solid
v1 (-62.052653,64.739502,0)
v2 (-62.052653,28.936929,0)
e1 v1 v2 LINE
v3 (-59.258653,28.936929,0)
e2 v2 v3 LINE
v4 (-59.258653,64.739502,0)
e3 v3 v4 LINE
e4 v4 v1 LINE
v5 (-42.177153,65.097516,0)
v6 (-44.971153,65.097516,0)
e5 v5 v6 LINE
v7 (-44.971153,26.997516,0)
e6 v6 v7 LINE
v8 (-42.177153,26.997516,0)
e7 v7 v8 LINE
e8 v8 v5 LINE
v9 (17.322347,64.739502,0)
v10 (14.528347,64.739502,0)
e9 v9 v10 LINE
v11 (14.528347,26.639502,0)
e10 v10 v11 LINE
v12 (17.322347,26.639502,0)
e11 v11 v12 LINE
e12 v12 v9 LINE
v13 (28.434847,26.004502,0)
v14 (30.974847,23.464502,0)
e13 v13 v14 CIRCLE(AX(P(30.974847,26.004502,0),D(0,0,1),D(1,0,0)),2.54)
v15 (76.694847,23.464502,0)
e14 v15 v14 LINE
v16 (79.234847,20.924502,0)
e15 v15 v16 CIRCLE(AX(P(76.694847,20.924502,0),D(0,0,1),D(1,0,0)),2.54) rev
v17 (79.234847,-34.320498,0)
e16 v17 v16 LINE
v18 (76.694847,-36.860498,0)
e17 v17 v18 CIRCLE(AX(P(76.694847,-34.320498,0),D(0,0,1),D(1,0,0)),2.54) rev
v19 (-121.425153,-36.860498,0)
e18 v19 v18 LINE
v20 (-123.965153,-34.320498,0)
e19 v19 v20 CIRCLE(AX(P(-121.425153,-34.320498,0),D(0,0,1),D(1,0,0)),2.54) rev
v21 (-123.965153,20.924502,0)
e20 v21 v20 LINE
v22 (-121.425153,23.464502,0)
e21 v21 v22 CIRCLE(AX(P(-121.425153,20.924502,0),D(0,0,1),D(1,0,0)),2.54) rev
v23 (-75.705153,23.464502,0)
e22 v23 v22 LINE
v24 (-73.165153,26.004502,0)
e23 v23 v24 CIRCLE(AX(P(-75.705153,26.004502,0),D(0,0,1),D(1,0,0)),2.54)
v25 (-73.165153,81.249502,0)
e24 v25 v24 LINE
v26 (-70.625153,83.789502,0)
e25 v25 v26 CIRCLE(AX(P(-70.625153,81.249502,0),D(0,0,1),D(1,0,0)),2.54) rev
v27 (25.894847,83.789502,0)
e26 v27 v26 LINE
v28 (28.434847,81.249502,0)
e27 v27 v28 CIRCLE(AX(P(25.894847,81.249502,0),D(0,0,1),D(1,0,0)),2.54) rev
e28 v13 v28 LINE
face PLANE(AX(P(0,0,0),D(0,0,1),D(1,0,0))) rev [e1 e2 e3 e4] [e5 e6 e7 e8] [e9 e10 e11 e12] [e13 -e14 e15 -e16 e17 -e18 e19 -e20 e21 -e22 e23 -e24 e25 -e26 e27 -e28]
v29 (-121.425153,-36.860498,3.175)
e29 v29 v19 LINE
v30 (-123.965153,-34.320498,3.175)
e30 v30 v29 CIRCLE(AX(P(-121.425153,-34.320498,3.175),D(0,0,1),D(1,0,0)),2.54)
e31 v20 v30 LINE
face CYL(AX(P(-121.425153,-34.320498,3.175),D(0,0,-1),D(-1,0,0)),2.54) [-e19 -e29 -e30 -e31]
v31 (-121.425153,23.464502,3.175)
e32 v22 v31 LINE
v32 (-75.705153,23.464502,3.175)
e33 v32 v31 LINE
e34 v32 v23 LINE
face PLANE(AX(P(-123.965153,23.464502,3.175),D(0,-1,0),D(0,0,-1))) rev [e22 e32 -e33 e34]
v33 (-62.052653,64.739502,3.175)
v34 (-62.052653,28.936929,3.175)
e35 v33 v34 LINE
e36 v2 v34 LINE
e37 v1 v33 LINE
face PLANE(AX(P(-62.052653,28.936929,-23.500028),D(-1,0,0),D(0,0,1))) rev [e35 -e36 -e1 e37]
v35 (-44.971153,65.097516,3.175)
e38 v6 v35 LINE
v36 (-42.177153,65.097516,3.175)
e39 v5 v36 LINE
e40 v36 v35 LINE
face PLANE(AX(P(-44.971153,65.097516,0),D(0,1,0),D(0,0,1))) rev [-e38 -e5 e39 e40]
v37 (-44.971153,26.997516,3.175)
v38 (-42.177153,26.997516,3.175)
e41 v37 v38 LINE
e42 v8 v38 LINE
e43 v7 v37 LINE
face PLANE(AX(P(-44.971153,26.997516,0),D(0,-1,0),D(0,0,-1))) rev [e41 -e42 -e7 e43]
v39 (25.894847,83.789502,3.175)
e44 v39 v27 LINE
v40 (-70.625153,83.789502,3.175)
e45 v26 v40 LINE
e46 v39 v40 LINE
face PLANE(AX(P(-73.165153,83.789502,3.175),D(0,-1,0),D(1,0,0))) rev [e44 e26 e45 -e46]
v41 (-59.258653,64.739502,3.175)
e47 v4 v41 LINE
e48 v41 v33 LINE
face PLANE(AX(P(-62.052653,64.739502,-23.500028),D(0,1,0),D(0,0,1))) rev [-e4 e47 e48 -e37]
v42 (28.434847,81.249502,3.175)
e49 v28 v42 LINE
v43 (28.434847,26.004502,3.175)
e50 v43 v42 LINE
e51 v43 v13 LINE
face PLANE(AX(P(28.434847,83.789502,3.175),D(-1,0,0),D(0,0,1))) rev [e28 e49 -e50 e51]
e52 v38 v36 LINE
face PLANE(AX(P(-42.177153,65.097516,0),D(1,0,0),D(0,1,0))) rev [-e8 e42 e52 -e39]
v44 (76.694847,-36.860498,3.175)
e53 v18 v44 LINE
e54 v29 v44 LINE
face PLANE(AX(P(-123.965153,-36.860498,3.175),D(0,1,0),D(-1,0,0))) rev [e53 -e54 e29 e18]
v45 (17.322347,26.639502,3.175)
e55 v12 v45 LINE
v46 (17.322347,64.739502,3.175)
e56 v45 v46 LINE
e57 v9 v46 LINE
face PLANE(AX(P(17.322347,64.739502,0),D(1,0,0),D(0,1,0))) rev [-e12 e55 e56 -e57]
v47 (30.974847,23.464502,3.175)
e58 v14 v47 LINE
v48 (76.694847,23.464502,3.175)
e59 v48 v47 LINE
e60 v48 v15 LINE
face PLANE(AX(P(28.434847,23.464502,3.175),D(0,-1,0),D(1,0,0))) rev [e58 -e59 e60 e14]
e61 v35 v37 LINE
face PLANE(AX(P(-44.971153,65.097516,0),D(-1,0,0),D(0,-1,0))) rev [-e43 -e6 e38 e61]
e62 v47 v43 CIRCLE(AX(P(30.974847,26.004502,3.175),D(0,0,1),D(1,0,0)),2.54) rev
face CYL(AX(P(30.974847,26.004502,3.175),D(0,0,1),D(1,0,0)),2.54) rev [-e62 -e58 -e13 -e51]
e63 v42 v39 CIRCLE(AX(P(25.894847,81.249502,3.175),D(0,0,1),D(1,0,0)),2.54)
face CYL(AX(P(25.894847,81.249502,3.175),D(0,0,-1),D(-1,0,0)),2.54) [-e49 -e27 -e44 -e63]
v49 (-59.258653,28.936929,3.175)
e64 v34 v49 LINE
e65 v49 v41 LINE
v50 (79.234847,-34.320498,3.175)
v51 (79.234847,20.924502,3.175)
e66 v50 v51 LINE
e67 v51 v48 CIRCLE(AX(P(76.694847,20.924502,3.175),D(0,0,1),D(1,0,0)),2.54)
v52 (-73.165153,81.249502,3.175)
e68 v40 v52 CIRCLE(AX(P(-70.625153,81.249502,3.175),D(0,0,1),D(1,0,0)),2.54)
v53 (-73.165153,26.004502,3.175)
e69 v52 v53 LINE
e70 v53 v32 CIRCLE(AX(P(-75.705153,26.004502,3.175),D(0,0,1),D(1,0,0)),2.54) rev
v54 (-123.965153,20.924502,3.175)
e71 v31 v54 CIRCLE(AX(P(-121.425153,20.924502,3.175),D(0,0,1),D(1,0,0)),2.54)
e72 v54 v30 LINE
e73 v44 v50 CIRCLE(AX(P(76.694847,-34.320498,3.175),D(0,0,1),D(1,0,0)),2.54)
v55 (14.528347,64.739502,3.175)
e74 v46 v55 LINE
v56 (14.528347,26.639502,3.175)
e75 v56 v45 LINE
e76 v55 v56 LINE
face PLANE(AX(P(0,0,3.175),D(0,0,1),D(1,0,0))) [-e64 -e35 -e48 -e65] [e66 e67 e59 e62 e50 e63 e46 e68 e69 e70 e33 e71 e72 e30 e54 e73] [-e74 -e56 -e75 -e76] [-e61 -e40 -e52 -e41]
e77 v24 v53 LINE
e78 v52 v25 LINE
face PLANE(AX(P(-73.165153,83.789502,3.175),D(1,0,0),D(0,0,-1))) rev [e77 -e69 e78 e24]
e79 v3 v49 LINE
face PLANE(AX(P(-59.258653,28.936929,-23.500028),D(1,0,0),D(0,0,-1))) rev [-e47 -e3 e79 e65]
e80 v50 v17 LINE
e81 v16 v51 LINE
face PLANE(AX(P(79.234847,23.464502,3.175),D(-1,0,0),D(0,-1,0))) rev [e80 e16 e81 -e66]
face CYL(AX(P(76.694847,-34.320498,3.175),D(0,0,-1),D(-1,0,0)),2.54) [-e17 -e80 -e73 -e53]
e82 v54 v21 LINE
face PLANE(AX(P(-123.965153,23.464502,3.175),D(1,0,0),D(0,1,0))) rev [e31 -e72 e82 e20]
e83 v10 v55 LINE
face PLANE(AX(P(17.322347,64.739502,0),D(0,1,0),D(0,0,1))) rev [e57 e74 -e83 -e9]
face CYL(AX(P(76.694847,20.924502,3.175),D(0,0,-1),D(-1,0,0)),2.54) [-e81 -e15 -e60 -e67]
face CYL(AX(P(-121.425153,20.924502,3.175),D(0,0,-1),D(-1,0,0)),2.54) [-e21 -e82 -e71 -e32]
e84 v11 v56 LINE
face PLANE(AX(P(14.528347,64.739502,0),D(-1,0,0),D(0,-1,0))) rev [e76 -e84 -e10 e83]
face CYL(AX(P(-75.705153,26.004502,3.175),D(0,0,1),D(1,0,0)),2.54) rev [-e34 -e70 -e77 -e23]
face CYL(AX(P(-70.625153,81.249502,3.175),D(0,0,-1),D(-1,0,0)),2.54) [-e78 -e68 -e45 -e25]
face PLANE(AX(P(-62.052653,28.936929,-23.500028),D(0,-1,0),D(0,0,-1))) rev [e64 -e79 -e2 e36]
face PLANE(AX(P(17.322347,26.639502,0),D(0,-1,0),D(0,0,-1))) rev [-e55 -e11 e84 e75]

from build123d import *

# Parameters (mm, degrees)
BOSS_EXTRUDE1_DEPTH    = 3.175
FILLET1_R              = 2.54
SKETCH2_W              = 2.794
SKETCH2_H              = 38.1
CUT_EXTRUDE1_DEPTH     = 3.175
CUT_EXTRUDE2_START     = -3.175
CUT_EXTRUDE2_OUTLINE_W = 2.794
CUT_EXTRUDE2_OUTLINE_H = 35.802572731
CUT_EXTRUDE2_DEPTH     = 3.175
SKETCH4_W              = 2.794
SKETCH4_H              = 38.1
CUT_EXTRUDE3_DEPTH     = 3.175


# Read off the part's stored shape, not the designer's step: Cut-Extrude2
with BuildPart() as part:
    # Sketch1 → Boss-Extrude1 (new body)
    with BuildSketch(Plane.XY):
        Polygon((28.434847271, 23.464502165), (79.234847271, 23.464502165), (79.234847271, -36.860497835), (-123.965152729, -36.860497835), (-123.965152729, 23.464502165), (-73.165152729, 23.464502165), (-73.165152729, 83.789502165), (28.434847271, 83.789502165), align=None)
    extrude(amount=BOSS_EXTRUDE1_DEPTH)

    # Fillet1
    fillet1_edges = [part.edges().sort_by_distance(p)[0] for p in [
        (-123.965152729, 23.464502165, 1.5875),
        (-73.165152729, 23.464502165, 1.5875),
        (-73.165152729, 83.789502165, 1.5875),
        (28.434847271, 83.789502165, 1.5875),
        (28.434847271, 23.464502165, 1.5875),
        (79.234847271, 23.464502165, 1.5875),
        (79.234847271, -36.860497835, 1.5875),
        (-123.965152729, -36.860497835, 1.5875),
    ]]
    fillet(fillet1_edges, radius=FILLET1_R)

    # Sketch2 → Cut-Extrude1 (cut)
    with BuildSketch(Plane.XY.offset(3.175)):
        with Locations((15.925347271, 45.689502165)):
            Rectangle(SKETCH2_W, SKETCH2_H)
    extrude(amount=-CUT_EXTRUDE1_DEPTH, mode=Mode.SUBTRACT)

    # Cut-Extrude2 outline → Cut-Extrude2 (cut)
    with BuildSketch(Plane.XY.offset(3.175).offset(CUT_EXTRUDE2_START)):
        with Locations((-60.655652729, 46.8382158)):
            Rectangle(CUT_EXTRUDE2_OUTLINE_W, CUT_EXTRUDE2_OUTLINE_H)
    extrude(amount=CUT_EXTRUDE2_DEPTH, mode=Mode.SUBTRACT)

    # Sketch4 → Cut-Extrude3 (cut)
    with BuildSketch(Plane.XY.offset(3.175)):
        with Locations((-43.574152729, 46.047516436)):
            Rectangle(SKETCH4_W, SKETCH4_H)
    extrude(amount=-CUT_EXTRUDE3_DEPTH, mode=Mode.SUBTRACT)


solid = part.part
